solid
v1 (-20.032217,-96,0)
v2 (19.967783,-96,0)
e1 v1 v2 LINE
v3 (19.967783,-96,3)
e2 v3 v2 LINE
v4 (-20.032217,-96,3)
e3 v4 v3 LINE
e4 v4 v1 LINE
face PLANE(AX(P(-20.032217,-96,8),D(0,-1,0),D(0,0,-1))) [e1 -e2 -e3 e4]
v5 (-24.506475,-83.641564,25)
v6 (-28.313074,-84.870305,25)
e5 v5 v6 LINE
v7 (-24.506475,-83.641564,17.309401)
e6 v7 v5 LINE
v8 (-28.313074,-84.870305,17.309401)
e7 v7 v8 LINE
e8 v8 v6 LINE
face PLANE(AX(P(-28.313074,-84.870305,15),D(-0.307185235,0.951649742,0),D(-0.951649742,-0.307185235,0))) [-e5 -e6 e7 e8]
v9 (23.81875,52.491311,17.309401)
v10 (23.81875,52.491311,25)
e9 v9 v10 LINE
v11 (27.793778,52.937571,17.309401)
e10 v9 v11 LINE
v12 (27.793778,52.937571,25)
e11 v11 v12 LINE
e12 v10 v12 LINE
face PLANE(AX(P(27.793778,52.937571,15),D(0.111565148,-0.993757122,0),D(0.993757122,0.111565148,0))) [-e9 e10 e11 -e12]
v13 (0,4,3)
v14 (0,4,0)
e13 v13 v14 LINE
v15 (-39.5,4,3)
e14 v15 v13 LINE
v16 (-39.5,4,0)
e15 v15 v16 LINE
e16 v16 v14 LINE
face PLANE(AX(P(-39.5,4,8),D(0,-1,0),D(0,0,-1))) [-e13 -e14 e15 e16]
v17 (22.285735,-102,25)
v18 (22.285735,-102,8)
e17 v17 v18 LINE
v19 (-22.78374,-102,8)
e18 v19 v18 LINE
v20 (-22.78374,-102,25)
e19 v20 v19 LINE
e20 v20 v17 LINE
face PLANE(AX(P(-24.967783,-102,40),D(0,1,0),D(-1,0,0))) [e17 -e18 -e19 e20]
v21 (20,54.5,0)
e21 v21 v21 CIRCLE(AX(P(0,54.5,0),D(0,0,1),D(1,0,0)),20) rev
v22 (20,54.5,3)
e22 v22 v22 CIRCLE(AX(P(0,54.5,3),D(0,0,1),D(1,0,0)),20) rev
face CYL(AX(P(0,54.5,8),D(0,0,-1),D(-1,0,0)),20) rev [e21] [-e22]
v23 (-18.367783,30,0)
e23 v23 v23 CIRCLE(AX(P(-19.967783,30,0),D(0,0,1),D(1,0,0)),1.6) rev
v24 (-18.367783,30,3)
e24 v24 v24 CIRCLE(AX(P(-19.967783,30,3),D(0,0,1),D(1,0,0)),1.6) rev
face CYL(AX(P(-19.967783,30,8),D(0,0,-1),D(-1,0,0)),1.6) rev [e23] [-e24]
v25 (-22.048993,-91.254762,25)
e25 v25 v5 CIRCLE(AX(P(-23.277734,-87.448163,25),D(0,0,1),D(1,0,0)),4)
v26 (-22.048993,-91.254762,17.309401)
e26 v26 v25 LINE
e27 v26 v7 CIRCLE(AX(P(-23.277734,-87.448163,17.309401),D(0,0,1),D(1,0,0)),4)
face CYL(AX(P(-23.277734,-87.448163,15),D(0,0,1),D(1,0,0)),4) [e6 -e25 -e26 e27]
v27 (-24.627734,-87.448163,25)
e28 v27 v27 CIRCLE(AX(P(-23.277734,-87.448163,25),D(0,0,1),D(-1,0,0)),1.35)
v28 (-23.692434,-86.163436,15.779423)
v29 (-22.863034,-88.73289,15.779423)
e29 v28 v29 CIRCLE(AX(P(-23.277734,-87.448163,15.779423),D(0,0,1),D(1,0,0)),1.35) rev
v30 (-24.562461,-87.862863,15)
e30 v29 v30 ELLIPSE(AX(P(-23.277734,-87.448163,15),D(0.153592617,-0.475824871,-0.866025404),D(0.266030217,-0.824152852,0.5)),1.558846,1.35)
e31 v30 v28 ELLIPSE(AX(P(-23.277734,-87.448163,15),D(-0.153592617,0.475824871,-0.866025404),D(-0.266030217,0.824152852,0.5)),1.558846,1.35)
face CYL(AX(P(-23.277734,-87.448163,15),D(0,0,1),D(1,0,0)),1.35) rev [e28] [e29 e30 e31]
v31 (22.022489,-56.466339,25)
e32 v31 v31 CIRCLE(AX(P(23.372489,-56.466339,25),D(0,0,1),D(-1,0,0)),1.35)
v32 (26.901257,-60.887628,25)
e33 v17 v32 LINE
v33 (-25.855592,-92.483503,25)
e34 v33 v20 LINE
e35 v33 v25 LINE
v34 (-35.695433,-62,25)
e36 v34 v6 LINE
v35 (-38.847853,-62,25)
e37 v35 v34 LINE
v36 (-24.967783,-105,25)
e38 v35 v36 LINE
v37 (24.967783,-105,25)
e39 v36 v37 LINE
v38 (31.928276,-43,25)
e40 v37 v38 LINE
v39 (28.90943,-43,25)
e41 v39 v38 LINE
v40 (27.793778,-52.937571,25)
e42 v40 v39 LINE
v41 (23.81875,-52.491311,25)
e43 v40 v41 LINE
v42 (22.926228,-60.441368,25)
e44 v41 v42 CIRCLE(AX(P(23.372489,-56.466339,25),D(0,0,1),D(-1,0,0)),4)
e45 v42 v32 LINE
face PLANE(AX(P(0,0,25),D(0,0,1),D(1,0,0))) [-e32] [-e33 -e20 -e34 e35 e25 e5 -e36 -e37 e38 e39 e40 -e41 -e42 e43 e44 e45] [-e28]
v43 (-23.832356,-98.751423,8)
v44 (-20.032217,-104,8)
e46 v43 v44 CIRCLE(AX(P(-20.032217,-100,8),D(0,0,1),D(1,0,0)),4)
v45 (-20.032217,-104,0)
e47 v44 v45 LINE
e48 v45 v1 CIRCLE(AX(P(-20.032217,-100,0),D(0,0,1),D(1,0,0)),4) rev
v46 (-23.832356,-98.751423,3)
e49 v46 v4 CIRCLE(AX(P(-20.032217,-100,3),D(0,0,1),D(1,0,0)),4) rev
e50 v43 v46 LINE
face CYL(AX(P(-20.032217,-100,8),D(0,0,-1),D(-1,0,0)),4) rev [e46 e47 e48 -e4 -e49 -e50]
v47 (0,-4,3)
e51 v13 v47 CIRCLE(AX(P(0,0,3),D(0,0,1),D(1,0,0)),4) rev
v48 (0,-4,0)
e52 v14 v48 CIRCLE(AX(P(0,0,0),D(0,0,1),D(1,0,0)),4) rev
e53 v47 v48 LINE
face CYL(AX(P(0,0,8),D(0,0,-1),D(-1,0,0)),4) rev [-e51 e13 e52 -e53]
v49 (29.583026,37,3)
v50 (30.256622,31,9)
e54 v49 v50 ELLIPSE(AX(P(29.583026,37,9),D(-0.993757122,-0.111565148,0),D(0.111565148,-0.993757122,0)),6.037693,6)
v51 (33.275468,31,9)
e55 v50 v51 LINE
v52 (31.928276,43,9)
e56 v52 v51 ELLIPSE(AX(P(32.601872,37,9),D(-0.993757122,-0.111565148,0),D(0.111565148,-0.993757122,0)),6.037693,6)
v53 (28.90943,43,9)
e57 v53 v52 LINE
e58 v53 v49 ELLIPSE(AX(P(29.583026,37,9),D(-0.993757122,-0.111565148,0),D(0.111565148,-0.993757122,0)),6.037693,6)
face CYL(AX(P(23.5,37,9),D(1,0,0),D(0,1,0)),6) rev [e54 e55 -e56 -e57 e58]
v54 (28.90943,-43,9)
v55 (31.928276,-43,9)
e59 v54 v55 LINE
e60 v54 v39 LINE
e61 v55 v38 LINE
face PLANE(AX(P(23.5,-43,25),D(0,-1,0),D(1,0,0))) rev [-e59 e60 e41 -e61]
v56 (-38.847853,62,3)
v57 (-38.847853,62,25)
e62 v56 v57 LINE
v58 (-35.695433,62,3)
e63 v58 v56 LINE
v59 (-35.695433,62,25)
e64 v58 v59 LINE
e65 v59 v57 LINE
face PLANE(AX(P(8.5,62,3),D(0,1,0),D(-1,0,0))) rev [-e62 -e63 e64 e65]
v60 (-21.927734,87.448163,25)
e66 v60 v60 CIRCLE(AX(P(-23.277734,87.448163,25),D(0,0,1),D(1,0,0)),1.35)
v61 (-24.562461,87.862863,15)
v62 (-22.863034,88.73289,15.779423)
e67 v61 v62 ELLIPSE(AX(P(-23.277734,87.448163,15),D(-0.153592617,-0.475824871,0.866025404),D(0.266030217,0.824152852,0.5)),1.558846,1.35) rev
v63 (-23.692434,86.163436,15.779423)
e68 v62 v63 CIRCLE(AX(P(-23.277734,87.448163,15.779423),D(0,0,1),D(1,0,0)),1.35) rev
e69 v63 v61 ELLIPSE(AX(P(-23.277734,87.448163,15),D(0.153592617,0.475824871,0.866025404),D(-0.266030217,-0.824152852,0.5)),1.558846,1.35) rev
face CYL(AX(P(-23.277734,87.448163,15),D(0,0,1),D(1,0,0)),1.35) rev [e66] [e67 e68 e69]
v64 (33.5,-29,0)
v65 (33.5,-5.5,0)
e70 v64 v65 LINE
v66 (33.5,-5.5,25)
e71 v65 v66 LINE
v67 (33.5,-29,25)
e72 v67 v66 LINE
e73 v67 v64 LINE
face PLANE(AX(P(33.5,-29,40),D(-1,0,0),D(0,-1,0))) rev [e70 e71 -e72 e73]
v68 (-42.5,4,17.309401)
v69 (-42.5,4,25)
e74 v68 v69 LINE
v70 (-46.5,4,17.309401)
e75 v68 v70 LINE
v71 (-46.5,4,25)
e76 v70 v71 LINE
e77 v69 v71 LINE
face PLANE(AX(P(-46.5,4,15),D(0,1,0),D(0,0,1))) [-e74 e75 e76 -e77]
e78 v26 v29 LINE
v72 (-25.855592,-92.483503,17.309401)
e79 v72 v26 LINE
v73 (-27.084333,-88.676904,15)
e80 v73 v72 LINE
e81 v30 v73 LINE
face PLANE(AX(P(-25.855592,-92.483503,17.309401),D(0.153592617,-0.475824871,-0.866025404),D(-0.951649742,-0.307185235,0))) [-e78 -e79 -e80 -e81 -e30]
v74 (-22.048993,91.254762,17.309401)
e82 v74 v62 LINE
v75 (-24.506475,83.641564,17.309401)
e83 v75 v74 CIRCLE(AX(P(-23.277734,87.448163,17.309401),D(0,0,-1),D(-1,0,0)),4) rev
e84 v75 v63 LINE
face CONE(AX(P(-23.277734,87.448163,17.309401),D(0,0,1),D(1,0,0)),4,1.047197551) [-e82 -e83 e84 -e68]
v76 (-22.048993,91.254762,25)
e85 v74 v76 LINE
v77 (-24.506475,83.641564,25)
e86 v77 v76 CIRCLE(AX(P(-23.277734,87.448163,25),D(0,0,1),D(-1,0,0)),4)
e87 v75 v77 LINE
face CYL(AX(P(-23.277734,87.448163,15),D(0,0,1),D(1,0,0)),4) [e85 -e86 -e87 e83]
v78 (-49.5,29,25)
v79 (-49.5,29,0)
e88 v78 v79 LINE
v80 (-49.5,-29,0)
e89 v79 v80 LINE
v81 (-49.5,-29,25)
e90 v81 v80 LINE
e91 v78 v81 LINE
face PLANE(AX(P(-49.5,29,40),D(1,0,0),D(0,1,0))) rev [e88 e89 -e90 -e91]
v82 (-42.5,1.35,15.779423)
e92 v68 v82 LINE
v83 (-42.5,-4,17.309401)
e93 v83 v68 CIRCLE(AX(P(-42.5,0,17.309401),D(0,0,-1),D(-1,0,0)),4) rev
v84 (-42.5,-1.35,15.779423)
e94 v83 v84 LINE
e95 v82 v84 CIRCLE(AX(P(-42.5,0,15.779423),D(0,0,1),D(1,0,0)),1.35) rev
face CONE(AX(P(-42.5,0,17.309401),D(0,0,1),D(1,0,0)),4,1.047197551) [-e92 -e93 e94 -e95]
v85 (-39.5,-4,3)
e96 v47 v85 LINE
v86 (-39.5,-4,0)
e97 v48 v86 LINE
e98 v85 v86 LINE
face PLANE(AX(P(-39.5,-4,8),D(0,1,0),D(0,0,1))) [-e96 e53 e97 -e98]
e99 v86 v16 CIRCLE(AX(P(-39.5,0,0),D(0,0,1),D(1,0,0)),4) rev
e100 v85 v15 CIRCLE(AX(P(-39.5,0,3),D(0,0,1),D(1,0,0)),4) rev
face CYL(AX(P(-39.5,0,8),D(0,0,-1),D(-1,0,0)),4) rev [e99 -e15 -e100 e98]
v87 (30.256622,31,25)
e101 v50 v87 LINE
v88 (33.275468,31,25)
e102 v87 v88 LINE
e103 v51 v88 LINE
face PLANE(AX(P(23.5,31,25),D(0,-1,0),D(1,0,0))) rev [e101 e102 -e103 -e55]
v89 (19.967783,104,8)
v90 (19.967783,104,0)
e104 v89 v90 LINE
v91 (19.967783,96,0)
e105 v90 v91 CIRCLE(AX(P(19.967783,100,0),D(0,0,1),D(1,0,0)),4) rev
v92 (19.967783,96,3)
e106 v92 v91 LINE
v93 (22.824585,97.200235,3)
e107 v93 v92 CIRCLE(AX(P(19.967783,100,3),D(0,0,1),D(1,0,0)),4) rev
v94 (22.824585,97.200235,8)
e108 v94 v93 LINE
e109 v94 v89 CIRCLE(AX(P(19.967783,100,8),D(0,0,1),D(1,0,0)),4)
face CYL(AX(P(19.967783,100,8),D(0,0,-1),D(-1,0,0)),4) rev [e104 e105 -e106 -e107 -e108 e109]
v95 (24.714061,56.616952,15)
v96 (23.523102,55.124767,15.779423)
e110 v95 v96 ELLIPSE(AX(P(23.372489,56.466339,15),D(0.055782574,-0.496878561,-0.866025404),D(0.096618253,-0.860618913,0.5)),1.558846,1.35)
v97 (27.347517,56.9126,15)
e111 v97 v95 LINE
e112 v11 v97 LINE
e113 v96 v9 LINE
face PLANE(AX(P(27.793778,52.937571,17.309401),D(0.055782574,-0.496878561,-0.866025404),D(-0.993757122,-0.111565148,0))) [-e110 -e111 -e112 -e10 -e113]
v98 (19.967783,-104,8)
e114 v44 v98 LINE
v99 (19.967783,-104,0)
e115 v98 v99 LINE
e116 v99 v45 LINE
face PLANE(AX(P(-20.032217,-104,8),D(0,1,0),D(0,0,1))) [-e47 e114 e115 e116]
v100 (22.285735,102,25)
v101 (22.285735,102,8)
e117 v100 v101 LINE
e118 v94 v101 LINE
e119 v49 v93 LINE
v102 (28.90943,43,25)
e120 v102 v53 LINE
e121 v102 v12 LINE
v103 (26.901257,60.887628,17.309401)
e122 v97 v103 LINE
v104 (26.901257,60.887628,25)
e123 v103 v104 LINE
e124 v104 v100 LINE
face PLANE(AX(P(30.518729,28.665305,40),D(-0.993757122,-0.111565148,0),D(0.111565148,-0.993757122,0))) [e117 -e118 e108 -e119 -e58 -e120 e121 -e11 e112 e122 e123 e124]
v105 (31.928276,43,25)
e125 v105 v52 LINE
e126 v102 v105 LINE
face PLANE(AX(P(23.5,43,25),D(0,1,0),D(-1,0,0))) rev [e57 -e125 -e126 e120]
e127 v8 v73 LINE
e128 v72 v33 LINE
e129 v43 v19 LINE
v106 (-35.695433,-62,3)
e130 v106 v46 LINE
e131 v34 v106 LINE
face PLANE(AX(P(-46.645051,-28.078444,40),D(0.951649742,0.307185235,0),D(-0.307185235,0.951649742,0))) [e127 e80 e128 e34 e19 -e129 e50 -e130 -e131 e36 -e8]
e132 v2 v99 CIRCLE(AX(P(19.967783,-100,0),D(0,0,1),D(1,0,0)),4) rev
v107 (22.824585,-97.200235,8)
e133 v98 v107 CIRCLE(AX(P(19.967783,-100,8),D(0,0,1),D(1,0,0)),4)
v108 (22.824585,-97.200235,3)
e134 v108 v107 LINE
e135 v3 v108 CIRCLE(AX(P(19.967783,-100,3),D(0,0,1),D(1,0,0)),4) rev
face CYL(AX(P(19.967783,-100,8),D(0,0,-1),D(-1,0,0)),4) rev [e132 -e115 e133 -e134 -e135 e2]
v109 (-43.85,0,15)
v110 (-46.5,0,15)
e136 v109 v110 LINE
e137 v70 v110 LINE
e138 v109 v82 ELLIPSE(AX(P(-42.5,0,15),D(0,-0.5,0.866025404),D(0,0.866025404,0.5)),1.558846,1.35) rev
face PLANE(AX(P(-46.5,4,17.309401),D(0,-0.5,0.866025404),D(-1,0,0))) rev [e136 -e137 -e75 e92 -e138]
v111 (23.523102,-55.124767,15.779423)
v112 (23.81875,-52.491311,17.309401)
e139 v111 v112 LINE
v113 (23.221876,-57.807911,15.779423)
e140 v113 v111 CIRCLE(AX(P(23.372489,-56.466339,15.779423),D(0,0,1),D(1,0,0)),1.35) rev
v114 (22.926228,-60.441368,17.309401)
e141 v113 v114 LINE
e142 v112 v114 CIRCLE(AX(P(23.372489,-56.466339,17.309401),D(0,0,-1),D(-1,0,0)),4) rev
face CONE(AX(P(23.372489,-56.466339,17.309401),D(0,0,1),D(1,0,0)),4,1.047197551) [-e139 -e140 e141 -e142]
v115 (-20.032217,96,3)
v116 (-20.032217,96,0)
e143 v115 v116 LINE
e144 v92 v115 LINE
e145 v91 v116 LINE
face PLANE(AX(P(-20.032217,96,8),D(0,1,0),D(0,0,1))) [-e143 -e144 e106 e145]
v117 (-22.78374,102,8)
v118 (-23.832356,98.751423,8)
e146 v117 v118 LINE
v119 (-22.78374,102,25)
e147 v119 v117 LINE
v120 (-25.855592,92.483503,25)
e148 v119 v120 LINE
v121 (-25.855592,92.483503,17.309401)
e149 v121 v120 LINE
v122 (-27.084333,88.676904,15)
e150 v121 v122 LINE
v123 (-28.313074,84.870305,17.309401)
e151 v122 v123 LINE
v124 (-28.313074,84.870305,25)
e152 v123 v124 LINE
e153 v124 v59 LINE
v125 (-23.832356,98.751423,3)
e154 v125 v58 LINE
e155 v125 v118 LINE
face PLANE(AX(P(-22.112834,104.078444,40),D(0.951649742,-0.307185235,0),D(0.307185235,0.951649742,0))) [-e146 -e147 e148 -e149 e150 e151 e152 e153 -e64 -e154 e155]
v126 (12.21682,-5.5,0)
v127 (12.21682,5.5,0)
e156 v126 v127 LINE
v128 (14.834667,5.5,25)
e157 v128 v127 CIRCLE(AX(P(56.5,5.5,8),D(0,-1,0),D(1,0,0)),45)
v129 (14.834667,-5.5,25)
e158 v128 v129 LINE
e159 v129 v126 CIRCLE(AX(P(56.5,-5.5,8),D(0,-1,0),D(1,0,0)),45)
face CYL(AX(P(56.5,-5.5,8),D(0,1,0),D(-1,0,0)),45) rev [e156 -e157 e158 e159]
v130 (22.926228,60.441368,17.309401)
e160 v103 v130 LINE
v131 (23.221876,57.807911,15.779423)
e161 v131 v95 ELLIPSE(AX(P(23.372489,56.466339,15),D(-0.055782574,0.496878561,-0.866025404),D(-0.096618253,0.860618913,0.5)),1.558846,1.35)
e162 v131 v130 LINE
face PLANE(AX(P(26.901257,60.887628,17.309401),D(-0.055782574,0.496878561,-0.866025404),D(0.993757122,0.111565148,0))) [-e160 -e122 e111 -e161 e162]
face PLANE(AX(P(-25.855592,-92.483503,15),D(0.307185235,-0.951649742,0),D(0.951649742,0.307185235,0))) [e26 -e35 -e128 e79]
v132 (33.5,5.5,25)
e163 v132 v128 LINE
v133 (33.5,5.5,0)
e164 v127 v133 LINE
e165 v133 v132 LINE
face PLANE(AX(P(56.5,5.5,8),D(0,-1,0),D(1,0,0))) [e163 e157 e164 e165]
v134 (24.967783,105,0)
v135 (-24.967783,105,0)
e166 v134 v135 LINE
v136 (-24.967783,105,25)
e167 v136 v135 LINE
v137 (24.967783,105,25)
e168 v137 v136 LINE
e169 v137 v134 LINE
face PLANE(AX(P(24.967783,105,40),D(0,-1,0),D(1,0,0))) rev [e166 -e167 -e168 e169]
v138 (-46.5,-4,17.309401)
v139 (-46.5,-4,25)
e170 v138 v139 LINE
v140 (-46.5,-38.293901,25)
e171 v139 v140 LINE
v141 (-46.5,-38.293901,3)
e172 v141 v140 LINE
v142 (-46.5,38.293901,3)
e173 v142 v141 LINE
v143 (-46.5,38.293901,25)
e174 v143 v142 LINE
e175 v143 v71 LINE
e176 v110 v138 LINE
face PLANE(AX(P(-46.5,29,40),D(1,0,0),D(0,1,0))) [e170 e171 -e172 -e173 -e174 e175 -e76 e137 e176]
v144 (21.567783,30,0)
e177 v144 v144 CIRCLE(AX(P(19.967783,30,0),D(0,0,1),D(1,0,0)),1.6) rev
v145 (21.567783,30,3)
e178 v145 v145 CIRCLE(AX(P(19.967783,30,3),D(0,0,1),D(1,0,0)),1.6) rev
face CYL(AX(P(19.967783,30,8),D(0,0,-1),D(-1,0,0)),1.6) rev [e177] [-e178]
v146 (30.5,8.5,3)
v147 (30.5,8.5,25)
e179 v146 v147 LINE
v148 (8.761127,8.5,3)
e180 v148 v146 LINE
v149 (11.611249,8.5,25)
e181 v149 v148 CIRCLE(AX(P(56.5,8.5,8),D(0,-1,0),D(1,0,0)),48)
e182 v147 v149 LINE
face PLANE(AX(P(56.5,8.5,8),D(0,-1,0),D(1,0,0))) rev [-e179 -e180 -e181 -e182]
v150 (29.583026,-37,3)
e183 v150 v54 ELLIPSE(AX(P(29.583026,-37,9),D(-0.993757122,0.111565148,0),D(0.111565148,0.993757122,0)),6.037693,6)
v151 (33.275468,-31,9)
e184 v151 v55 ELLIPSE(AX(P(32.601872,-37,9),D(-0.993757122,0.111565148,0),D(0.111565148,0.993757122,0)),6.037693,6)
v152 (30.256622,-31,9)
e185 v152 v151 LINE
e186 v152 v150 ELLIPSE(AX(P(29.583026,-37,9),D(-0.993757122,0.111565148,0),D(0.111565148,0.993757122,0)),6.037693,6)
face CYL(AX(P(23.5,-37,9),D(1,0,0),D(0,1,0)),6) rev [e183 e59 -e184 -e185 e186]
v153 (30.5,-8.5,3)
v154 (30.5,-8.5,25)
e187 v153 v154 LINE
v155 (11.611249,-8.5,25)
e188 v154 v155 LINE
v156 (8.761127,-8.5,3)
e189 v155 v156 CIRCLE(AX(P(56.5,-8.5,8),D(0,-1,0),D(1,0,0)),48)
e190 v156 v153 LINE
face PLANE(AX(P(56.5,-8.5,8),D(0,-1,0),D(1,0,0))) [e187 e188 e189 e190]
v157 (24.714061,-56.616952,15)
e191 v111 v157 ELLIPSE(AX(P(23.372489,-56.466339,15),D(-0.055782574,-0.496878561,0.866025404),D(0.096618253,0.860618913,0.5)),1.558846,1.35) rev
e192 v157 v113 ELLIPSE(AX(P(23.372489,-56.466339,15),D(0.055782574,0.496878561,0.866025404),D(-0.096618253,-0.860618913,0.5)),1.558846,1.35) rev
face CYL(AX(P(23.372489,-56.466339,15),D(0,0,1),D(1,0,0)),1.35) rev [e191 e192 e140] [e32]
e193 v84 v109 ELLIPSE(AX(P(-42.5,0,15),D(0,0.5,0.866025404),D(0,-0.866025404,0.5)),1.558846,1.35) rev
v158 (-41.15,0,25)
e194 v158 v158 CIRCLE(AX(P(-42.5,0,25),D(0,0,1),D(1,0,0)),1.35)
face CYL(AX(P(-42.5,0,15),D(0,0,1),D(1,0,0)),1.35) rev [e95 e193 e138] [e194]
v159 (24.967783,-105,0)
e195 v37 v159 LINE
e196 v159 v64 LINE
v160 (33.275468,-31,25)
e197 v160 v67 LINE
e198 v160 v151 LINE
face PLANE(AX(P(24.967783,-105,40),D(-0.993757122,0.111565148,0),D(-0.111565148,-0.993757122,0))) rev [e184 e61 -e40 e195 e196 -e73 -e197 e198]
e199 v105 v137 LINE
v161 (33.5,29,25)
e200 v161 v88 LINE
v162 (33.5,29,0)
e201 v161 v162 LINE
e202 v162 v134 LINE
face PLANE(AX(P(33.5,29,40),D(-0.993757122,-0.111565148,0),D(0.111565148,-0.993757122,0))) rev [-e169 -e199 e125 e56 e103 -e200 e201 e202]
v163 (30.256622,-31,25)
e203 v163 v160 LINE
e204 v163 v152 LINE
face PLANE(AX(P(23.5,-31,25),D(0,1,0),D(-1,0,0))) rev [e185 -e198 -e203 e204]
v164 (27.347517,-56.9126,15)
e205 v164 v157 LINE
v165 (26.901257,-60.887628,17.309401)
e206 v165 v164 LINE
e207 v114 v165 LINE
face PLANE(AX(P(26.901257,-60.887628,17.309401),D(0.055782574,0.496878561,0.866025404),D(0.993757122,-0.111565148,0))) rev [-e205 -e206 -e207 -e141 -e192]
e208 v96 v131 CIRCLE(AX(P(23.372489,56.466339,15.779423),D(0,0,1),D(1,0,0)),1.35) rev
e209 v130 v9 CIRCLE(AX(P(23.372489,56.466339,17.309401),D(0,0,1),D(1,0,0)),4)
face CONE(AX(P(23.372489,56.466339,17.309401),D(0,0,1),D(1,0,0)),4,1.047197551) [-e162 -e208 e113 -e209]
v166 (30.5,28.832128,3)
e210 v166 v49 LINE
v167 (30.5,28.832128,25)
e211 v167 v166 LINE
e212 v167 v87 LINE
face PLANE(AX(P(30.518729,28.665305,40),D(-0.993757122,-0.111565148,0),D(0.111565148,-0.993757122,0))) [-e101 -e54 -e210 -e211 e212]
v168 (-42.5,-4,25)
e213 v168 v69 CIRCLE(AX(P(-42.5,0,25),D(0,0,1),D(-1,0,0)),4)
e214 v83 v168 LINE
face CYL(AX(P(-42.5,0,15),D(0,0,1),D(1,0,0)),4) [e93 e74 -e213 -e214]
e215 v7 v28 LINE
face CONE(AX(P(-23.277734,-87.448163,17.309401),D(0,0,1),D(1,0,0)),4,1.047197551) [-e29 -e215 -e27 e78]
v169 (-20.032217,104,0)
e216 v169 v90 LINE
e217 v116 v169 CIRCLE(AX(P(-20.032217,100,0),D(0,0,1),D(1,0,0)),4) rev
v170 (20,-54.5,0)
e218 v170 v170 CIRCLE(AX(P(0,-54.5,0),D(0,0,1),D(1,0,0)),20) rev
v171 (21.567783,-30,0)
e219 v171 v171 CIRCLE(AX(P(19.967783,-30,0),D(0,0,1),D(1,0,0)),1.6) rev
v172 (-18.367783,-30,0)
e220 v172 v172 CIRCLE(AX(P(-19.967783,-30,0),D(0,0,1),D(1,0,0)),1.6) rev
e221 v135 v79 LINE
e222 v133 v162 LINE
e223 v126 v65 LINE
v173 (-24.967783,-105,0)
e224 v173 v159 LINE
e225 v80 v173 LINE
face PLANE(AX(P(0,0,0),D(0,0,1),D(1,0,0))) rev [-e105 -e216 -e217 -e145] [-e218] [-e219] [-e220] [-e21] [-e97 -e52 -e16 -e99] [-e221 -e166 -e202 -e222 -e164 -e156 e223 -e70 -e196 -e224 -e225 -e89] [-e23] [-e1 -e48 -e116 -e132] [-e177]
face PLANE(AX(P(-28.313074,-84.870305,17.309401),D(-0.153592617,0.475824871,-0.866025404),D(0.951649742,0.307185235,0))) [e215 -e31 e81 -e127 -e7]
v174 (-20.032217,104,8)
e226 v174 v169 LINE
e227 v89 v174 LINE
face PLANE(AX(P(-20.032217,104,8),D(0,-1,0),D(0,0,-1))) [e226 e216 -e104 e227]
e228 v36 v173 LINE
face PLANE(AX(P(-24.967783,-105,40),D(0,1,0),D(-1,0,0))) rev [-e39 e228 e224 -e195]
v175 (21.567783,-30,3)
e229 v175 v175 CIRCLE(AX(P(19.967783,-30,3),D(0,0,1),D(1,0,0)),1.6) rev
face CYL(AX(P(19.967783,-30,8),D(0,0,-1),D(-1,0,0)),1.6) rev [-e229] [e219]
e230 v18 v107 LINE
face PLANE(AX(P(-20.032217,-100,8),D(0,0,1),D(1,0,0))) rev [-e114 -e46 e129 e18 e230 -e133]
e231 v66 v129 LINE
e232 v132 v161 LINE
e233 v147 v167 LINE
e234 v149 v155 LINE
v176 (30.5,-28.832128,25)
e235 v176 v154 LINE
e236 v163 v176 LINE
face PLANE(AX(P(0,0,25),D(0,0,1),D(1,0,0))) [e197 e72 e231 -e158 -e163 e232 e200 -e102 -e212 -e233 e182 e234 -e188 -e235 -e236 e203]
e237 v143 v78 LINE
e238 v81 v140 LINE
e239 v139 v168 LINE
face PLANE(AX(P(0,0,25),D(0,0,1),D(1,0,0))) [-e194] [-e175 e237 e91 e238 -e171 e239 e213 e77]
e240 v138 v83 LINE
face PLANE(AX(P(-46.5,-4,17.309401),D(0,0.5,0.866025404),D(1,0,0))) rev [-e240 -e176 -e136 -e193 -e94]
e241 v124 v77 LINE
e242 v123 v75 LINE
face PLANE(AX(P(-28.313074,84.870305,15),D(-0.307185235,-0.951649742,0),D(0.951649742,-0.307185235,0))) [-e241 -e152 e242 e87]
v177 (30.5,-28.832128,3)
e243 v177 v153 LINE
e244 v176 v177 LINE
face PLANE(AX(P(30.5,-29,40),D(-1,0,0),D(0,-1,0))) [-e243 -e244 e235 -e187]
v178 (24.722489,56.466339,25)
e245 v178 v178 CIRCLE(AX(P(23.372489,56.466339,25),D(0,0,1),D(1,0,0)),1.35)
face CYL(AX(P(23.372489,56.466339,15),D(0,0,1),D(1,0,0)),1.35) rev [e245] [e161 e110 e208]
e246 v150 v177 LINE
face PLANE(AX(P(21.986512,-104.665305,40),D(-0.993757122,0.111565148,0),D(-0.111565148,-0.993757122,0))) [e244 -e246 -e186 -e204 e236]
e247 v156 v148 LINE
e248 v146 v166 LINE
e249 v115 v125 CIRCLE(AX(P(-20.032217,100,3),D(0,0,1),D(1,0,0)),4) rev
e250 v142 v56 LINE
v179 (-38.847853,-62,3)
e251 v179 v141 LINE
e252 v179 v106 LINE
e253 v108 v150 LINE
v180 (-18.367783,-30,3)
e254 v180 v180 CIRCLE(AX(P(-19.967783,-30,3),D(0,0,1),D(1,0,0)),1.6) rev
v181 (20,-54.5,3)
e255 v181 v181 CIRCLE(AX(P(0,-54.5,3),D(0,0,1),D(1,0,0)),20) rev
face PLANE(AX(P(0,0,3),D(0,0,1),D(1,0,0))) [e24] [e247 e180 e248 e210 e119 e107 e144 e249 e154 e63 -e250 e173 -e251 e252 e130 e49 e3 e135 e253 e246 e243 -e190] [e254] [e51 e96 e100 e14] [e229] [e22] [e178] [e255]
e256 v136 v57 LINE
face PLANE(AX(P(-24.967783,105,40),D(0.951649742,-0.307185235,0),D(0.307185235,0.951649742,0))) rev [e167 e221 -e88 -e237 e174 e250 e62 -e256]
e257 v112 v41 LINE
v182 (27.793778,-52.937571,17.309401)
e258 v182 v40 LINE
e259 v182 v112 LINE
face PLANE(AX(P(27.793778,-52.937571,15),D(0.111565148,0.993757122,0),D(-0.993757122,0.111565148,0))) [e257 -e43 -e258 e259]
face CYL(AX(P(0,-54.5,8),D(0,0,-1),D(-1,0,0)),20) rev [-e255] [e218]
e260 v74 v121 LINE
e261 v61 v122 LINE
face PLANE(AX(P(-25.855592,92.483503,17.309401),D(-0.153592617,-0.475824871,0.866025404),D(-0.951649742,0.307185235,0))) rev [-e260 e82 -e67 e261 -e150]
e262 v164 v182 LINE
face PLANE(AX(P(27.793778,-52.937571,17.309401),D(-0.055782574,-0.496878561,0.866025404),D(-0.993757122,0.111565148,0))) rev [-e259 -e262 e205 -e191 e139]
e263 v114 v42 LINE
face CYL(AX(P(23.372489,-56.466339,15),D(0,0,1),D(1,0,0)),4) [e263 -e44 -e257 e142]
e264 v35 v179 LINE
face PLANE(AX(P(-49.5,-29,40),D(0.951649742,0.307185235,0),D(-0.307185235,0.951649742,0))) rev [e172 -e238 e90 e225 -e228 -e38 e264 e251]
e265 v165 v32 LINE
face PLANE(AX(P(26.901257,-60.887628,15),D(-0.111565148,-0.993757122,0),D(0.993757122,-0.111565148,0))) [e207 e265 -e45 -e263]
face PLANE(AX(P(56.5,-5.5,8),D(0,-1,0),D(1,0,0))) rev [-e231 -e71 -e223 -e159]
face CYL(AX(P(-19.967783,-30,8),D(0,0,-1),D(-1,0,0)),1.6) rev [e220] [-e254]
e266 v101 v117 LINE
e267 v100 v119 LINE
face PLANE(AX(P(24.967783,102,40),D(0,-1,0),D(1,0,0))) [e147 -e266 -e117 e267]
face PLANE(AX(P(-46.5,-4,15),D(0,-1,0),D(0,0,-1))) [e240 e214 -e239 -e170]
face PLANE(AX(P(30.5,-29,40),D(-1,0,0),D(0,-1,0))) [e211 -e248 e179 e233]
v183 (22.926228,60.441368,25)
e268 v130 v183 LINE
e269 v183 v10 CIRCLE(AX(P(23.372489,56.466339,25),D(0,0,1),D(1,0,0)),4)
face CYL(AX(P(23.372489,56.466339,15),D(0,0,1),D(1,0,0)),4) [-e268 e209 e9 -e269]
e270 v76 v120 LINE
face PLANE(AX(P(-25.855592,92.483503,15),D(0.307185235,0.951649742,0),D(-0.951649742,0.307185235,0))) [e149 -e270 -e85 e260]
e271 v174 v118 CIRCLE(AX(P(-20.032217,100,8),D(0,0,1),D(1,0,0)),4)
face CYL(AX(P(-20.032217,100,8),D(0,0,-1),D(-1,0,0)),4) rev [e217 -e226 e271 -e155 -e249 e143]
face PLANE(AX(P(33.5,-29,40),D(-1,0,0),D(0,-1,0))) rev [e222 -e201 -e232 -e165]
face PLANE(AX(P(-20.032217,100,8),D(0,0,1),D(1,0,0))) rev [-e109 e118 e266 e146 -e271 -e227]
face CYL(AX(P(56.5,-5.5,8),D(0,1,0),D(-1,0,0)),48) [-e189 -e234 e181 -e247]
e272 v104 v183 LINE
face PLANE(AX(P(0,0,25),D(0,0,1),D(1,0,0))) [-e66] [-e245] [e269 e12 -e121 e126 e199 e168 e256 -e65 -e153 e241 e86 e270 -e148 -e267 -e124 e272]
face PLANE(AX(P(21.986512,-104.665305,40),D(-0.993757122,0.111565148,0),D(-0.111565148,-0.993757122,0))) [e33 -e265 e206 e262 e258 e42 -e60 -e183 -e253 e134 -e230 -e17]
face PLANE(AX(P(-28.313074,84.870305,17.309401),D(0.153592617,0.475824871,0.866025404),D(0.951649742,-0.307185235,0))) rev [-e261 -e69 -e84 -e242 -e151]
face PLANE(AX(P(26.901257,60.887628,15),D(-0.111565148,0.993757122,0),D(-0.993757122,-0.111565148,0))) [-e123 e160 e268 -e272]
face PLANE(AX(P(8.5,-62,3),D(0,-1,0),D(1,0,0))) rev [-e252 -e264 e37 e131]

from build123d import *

# Parameters (mm, degrees)
EXTRUDE1_DEPTH          = 40
CHAMFER1_SIZE           = 20
CHAMFER1_SIZE2          = 11.547005384
CUT_EXTRUDE1_DEPTH      = 3
CUT_EXTRUDE1_DEPTH_BACK = 8
SKETCH4_R               = 45
SHELL2_T                = -3
SKETCH6_W               = 125.382075166
SKETCH6_H               = 262.961923039
CUT_EXTRUDE3_DEPTH      = 15
SKETCH7_W               = 55
SKETCH7_H               = 124
CUT_EXTRUDE4_DEPTH      = 22
CUT_EXTRUDE5_DEPTH      = 5
CUT_EXTRUDE5_DEPTH_BACK = 12
SKETCH8_R               = 20
SKETCH8_R_2             = 1.6
CUT_EXTRUDE6_DEPTH      = 10
SKETCH10_R              = 1.35
EXTRUDE2_DEPTH          = 10
CHAMFER2_SIZE           = 2.309401077
CHAMFER2_SIZE_2         = 4


with BuildPart() as part:
    # Sketch2 → Extrude1 (new body)
    with BuildSketch(Plane.XY):
        Polygon((24.967783135, -105), (33.5, -29), (33.5, 29), (24.967783135, 105), (-24.967783135, 105), (-49.5, 29), (-49.5, -29), (-24.967783135, -105), align=None)
    extrude(amount=EXTRUDE1_DEPTH)

    # Chamfer1
    chamfer1_edges = [part.edges().sort_by_distance(p)[0] for p in [
        (0, -105, 40),
        (29.233891568, -67, 40),
        (33.5, 0, 40),
        (29.233891568, 67, 40),
        (0, 105, 40),
        (-37.233891568, 67, 40),
        (-49.5, 0, 40),
        (-37.233891568, -67, 40),
    ]]
    chamfer1_side = [part.faces().sort_by_distance(p)[0] for p in [
        (-5.515477183, 0, 40),
    ]]
    chamfer(chamfer1_edges, length=CHAMFER1_SIZE, length2=CHAMFER1_SIZE2, reference=chamfer1_side[0])

    # Sketch4 → Cut-Extrude1 (cut, two sides: drawn at the far end of the back side and taken through both)
    with BuildSketch(Plane.XZ.offset(2.5).offset(-CUT_EXTRUDE1_DEPTH_BACK)):
        with Locations((56.5, 8)):
            Circle(SKETCH4_R)
    extrude(amount=CUT_EXTRUDE1_DEPTH + CUT_EXTRUDE1_DEPTH_BACK, mode=Mode.SUBTRACT)

    # Shell2
    shell2_openings = [part.faces().sort_by_distance(p)[0] for p in [
        (-6.280046319, 0, 40),
    ]]
    offset(amount=SHELL2_T, openings=shell2_openings, kind=Kind.INTERSECTION)

    # Sketch6 → Cut-Extrude3 (cut)
    with BuildSketch(Plane.XY.offset(40)):
        with Locations((5.510547988, -25.491958467)):
            Rectangle(SKETCH6_W, SKETCH6_H)
    extrude(amount=-CUT_EXTRUDE3_DEPTH, mode=Mode.SUBTRACT)

    # Sketch7 → Cut-Extrude4 (cut)
    with BuildSketch(Plane.XY.offset(25)):
        with Locations((-19, 0)):
            Rectangle(SKETCH7_W, SKETCH7_H)
    extrude(amount=-CUT_EXTRUDE4_DEPTH, mode=Mode.SUBTRACT)

    # Sketch8 → Cut-Extrude5 (cut, two sides: drawn at the far end of the back side and taken through both)
    with BuildSketch(Plane.XY.offset(3).offset(-CUT_EXTRUDE5_DEPTH_BACK)):
        with Locations((0, 54.5)):
            Circle(SKETCH8_R)
        with Locations((0, -54.5)):
            Circle(SKETCH8_R)
        with Locations((19.967783135, -30)):
            Circle(SKETCH8_R_2)
        with Locations((-19.967783135, -30)):
            Circle(SKETCH8_R_2)
        with Locations((19.967783135, 30)):
            Circle(SKETCH8_R_2)
        with Locations((-19.967783135, 30)):
            Circle(SKETCH8_R_2)
        with BuildLine():
            Line((-20.032216865, 104), (19.967783135, 104))
            ThreePointArc((19.967783135, 104), (23.967783135, 100), (19.967783135, 96))
            Line((19.967783135, 96), (-20.032216865, 96))
            ThreePointArc((-20.032216865, 96), (-24.032216865, 100), (-20.032216865, 104))
        make_face()
        with BuildLine():
            Line((-20.032216865, -96), (19.967783135, -96))
            ThreePointArc((19.967783135, -96), (23.967783135, -100), (19.967783135, -104))
            Line((19.967783135, -104), (-20.032216865, -104))
            ThreePointArc((-20.032216865, -104), (-24.032216865, -100), (-20.032216865, -96))
        make_face()
        with BuildLine():
            Line((-39.5, 4), (0, 4))
            ThreePointArc((0, 4), (4, 0), (0, -4))
            Line((0, -4), (-39.5, -4))
            ThreePointArc((-39.5, -4), (-43.5, 0), (-39.5, 4))
        make_face()
    extrude(amount=CUT_EXTRUDE5_DEPTH + CUT_EXTRUDE5_DEPTH_BACK, mode=Mode.SUBTRACT)

    # Sketch9 → Cut-Extrude6 (cut)
    with BuildSketch(Plane(origin=(33.5, 0, 0), x_dir=(0, 0, -1), z_dir=(1, 0, 0))):
        with BuildLine():
            Line((-25, 43), (-9, 43))
            ThreePointArc((-9, 43), (-3, 37), (-9, 31))
            Line((-9, 31), (-25, 31))
            ThreePointArc((-25, 31), (-31, 37), (-25, 43))
        make_face()
        with BuildLine():
            Line((-25, -31), (-9, -31))
            ThreePointArc((-9, -31), (-3, -37), (-9, -43))
            Line((-9, -43), (-25, -43))
            ThreePointArc((-25, -43), (-31, -37), (-25, -31))
        make_face()
    extrude(amount=-CUT_EXTRUDE6_DEPTH, mode=Mode.SUBTRACT)

    # Sketch10 → Extrude2 (add)
    # profile 1 of 5: a face of its own
    with BuildSketch(Plane.XY.offset(25)):
        with BuildLine():
            Line((-25.855592129, 92.48350258), (-28.313074008, 84.870304644))
            Line((-28.313074008, 84.870304644), (-24.50647504, 83.641563704))
            ThreePointArc((-24.50647504, 83.641563704), (-19.471135132, 86.219421733), (-22.048993161, 91.25476164))
            Line((-22.048993161, 91.25476164), (-25.855592129, 92.48350258))
        make_face()
        with Locations((-23.2777341, 87.448162672)):
            Circle(SKETCH10_R, mode=Mode.SUBTRACT)
    # profile 2 of 5: a face of its own
    with BuildSketch(Plane.XY.offset(25)):
        with BuildLine():
            Line((-46.5, 4), (-46.5, -4))
            Line((-46.5, -4), (-42.5, -4))
            ThreePointArc((-42.5, -4), (-38.5, 0), (-42.5, 4))
            Line((-42.5, 4), (-46.5, 4))
        make_face()
        with Locations((-42.5, 0)):
            Circle(SKETCH10_R, mode=Mode.SUBTRACT)
    # profile 3 of 5: a face of its own
    with BuildSketch(Plane.XY.offset(25)):
        with BuildLine():
            Line((27.793778068, -52.937571221), (23.81874958, -52.491310627))
            ThreePointArc((23.81874958, -52.491310627), (19.397460498, -56.020078522), (22.926228393, -60.441367604))
            Line((22.926228393, -60.441367604), (26.901256881, -60.887628197))
            Line((26.901256881, -60.887628197), (27.793778068, -52.937571221))
        make_face()
        with Locations(Location((23.372488986, -56.466339116, 0), (0, 0, 180))):
            Circle(SKETCH10_R, mode=Mode.SUBTRACT)
    # profile 4 of 5: a face of its own
    with BuildSketch(Plane.XY.offset(25)):
        with BuildLine():
            Line((26.901256881, 60.887628197), (27.793778068, 52.937571221))
            Line((27.793778068, 52.937571221), (23.81874958, 52.491310627))
            ThreePointArc((23.81874958, 52.491310627), (19.397460498, 56.020078522), (22.926228393, 60.441367604))
            Line((22.926228393, 60.441367604), (26.901256881, 60.887628197))
        make_face()
        with Locations((23.372488986, 56.466339116)):
            Circle(SKETCH10_R, mode=Mode.SUBTRACT)
    # profile 5 of 5: a face of its own
    with BuildSketch(Plane.XY.offset(25)):
        with BuildLine():
            Line((-28.313074008, -84.870304644), (-24.50647504, -83.641563704))
            ThreePointArc((-24.50647504, -83.641563704), (-19.471135132, -86.219421733), (-22.048993161, -91.25476164))
            Line((-22.048993161, -91.25476164), (-25.855592129, -92.48350258))
            Line((-25.855592129, -92.48350258), (-28.313074008, -84.870304644))
        make_face()
        with Locations(Location((-23.2777341, -87.448162672, 0), (0, 0, 180))):
            Circle(SKETCH10_R, mode=Mode.SUBTRACT)
    extrude(amount=-EXTRUDE2_DEPTH)

    # Chamfer2
    # the kernel refuses this chamfer: 4, 2.309401077 mm, written as the material it takes off along each edge
    with BuildSketch(Plane(origin=(22.926228393, 60.441367604, 15), x_dir=(0, 0, 1), z_dir=(0.9937571220719369, 0.11156514837215789, 0)), Plane(origin=(-22.048993161, -91.25476164, 15), x_dir=(0, 0, 1), z_dir=(-0.9516497420147145, -0.30718523487193755, 0))) as chamfer2_piece_1:
        Polygon((CHAMFER2_SIZE, 0), (0, CHAMFER2_SIZE_2), (0, 0), align=None)
    extrude(amount=4, mode=Mode.SUBTRACT)
    with BuildSketch(Plane(origin=(23.372488986, 56.466339116, 15), x_dir=(0.11156514837215781, -0.993757122071937, 0), z_dir=(0.993757122071937, 0.11156514837215781, 0))) as chamfer2_piece_2:
        Polygon((4 - CHAMFER2_SIZE_2, 0), (4, -CHAMFER2_SIZE), (4, 0), align=None)
    revolve(axis=Axis((23.372488986, 56.466339116, 15), (0, 0, -1)), revolution_arc=180, mode=Mode.SUBTRACT)
    with BuildSketch(Plane(origin=(27.793778068, 52.937571221, 15), x_dir=(-0.11156514837215799, 0.993757122071937, 0), z_dir=(-0.9937571220719369, -0.11156514837215799, 0)), Plane(origin=(-28.313074008, -84.870304644, 15), x_dir=(0.3071852348719375, -0.9516497420147145, 0), z_dir=(0.9516497420147145, 0.30718523487193755, 0))) as chamfer2_piece_3:
        Polygon((CHAMFER2_SIZE_2, 0), (0, -CHAMFER2_SIZE), (0, 0), align=None)
    extrude(amount=4, mode=Mode.SUBTRACT)
    with BuildSketch(Plane(origin=(-42.5, 4, 15), x_dir=(0, -1, 0), z_dir=(-1, 0, 0)), Plane(origin=(-22.048993161, 91.25476164, 15), x_dir=(-0.3071852348719375, -0.9516497420147145, 0), z_dir=(-0.9516497420147145, 0.30718523487193755, 0)), Plane(origin=(22.926228393, -60.441367604, 15), x_dir=(0.11156514837215789, 0.993757122071937, 0), z_dir=(0.9937571220719369, -0.11156514837215789, 0))) as chamfer2_piece_4:
        Polygon((CHAMFER2_SIZE_2, 0), (0, CHAMFER2_SIZE), (0, 0), align=None)
    extrude(amount=4, mode=Mode.SUBTRACT)
    with BuildSketch(Plane(origin=(-42.5, 0, 15), x_dir=(0, -1, 0), z_dir=(-1, 0, 0))) as chamfer2_piece_5:
        Polygon((4 - CHAMFER2_SIZE_2, 0), (4, CHAMFER2_SIZE), (4, 0), align=None)
    revolve(axis=Axis((-42.5, 0, 15), (0, 0, 1)), revolution_arc=180, mode=Mode.SUBTRACT)
    with BuildSketch(Plane(origin=(-46.5, -4, 15), x_dir=(0, 0, 1), z_dir=(1, 0, 0)), Plane(origin=(-28.313074008, 84.870304644, 15), x_dir=(0, 0, 1), z_dir=(0.9516497420147144, -0.30718523487193783, 0)), Plane(origin=(27.793778068, -52.937571221, 15), x_dir=(0, 0, 1), z_dir=(-0.9937571220719369, 0.11156514837215789, 0))) as chamfer2_piece_6:
        Polygon((CHAMFER2_SIZE, 0), (0, -CHAMFER2_SIZE_2), (0, 0), align=None)
    extrude(amount=4, mode=Mode.SUBTRACT)
    with BuildSketch(Plane(origin=(-23.2777341, 87.448162672, 15), x_dir=(-0.3071852348719437, -0.9516497420147125, 0), z_dir=(-0.9516497420147125, 0.3071852348719437, 0))) as chamfer2_piece_7:
        Polygon((4 - CHAMFER2_SIZE_2, 0), (4, CHAMFER2_SIZE), (4, 0), align=None)
    revolve(axis=Axis((-23.2777341, 87.448162672, 15), (0, 0, 1)), revolution_arc=180, mode=Mode.SUBTRACT)
    with BuildSketch(Plane(origin=(-23.2777341, -87.448162672, 15), x_dir=(-0.3071852348719429, 0.9516497420147128, 0), z_dir=(-0.9516497420147128, -0.3071852348719429, 0))) as chamfer2_piece_8:
        Polygon((4 - CHAMFER2_SIZE_2, 0), (4, -CHAMFER2_SIZE), (4, 0), align=None)
    revolve(axis=Axis((-23.2777341, -87.448162672, 15), (0, 0, -1)), revolution_arc=180, mode=Mode.SUBTRACT)
    with BuildSketch(Plane(origin=(23.372488986, -56.466339116, 15), x_dir=(0.11156514837215692, 0.993757122071937, 0), z_dir=(0.993757122071937, -0.11156514837215692, 0))) as chamfer2_piece_9:
        Polygon((4 - CHAMFER2_SIZE_2, 0), (4, CHAMFER2_SIZE), (4, 0), align=None)
    revolve(axis=Axis((23.372488986, -56.466339116, 15), (0, 0, 1)), revolution_arc=180, mode=Mode.SUBTRACT)


solid = part.part
